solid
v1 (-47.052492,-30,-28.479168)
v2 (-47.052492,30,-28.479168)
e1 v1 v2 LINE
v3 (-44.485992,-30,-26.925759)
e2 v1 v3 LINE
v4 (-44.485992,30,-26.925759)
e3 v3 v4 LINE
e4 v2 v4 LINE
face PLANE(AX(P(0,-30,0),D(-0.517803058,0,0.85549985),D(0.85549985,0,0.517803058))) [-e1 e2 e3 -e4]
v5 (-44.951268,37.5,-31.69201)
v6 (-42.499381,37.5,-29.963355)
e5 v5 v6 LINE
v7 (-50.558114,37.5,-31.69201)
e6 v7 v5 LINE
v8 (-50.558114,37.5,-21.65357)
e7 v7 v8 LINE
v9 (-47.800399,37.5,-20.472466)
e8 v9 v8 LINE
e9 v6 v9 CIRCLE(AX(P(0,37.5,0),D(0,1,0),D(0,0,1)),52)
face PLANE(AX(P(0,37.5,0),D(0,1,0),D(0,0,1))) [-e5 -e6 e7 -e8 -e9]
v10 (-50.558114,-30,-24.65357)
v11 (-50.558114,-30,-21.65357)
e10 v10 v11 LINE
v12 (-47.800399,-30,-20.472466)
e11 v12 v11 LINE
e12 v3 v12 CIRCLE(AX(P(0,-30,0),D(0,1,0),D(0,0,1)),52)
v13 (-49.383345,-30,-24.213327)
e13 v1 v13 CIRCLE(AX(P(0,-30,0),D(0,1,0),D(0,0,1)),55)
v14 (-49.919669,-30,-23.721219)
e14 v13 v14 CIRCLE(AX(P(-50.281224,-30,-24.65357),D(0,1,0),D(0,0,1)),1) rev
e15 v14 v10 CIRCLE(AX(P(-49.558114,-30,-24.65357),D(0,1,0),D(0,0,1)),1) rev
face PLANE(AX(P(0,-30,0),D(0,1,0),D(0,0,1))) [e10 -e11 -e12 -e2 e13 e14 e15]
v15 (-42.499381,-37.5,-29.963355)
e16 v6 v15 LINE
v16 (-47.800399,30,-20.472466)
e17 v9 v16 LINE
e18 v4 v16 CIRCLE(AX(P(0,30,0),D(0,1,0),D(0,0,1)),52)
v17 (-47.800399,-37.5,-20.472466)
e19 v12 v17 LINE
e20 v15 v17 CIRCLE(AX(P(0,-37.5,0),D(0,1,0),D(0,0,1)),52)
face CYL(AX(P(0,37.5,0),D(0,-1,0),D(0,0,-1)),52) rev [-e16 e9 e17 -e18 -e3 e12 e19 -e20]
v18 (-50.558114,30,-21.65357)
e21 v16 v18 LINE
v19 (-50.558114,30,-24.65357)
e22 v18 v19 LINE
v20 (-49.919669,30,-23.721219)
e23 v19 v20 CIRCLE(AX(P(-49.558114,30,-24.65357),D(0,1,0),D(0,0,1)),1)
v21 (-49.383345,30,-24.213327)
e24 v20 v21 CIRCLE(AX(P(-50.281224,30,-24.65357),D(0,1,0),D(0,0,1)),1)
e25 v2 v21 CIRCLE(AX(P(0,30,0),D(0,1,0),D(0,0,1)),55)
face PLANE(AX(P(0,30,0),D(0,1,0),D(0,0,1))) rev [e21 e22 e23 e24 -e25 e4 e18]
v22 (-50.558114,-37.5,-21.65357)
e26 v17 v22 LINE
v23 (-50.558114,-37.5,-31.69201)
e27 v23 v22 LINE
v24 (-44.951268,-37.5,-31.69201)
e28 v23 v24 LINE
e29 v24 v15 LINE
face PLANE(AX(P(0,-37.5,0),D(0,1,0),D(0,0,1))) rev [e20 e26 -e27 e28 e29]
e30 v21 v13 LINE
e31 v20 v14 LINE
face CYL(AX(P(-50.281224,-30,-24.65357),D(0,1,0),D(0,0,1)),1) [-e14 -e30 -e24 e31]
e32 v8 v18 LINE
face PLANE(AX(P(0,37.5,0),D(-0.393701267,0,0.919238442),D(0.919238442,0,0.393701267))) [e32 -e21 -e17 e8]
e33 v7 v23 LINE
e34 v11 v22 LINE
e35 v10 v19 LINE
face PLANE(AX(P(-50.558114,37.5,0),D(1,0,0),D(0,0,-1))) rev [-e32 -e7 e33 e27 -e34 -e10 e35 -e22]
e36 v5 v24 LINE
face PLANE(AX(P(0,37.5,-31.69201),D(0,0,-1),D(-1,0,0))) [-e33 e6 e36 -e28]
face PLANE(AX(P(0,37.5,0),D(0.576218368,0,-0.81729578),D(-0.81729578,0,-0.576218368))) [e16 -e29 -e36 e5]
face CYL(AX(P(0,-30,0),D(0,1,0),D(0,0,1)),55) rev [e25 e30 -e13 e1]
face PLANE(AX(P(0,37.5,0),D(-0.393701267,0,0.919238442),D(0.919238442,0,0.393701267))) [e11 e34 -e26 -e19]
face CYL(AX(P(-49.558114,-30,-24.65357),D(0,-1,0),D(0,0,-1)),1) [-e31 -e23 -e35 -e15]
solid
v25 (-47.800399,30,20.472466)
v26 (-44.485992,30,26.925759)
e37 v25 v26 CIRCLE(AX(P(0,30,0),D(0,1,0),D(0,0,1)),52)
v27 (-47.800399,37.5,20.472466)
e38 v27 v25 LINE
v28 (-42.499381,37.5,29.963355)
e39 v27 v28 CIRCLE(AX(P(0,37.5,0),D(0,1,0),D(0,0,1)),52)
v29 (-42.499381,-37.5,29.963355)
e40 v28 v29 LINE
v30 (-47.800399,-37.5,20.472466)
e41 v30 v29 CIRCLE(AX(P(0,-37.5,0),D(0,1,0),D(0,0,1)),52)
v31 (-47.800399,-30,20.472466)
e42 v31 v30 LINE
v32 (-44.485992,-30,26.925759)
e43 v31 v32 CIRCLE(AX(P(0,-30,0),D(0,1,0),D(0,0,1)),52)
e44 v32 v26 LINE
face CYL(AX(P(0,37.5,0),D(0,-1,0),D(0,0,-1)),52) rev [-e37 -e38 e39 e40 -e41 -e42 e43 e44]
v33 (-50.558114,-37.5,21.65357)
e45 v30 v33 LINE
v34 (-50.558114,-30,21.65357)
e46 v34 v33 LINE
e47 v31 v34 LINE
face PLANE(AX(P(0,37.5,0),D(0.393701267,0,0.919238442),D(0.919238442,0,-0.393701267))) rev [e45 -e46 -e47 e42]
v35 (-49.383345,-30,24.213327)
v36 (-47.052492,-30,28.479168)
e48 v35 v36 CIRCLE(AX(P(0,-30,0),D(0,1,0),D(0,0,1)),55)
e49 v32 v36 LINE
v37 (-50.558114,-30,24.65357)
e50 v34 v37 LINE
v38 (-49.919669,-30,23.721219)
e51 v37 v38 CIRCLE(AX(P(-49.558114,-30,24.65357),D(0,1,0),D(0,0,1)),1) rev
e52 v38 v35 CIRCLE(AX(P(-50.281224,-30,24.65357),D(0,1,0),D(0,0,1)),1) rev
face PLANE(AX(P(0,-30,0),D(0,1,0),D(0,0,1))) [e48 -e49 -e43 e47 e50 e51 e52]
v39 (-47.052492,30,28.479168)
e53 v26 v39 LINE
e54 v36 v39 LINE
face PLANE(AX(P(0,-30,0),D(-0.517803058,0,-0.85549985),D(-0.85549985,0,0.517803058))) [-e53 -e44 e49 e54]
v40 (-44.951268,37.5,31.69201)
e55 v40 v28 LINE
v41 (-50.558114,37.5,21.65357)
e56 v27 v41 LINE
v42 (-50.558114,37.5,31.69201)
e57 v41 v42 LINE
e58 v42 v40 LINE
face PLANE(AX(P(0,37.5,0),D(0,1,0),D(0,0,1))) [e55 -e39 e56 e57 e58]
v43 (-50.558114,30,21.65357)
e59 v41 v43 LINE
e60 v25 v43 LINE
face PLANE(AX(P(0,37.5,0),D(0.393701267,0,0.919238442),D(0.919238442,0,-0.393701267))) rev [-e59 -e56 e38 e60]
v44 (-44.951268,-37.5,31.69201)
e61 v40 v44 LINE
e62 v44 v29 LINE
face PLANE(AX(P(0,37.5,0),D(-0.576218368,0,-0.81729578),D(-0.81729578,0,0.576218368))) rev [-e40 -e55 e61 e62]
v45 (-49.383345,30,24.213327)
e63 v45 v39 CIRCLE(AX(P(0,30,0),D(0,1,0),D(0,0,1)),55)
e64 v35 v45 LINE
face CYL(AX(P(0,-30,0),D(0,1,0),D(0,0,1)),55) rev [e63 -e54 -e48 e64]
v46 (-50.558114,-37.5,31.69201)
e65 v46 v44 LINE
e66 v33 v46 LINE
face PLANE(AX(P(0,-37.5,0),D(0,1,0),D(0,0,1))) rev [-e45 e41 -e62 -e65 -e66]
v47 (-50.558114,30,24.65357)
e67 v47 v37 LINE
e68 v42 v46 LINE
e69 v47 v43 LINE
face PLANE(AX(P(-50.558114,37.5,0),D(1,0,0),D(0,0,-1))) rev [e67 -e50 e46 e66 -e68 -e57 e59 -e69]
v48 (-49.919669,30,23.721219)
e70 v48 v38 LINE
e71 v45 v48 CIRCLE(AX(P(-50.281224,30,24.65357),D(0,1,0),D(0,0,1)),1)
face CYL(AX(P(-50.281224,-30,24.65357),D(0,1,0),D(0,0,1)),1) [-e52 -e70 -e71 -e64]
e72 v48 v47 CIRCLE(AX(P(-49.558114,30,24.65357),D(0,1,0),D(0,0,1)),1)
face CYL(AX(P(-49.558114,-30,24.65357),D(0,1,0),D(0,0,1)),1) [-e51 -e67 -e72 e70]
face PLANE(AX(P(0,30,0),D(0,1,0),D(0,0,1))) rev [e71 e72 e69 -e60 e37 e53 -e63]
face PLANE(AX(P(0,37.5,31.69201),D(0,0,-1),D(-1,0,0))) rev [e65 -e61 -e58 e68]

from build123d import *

# Parameters (mm, degrees)
BOSS_EXTRUDE1_DEPTH   = 37.5
BOSS_EXTRUDE1_2_DEPTH = 37.5
CUT_EXTRUDE1_START    = -30
CUT_EXTRUDE1_DEPTH    = 60
SKETCH2_W             = 47.307139372
SKETCH2_H             = 60
CUT_EXTRUDE2_DEPTH    = 10
FILLET1_R             = 1
FILLET2_R             = 1


# Read off the part's stored shape, not the designer's step: Cut-Extrude1
with BuildPart() as part:
    # Sketch1 → Boss-Extrude1 (new, symmetric)
    with BuildSketch(Plane(origin=(0, 0, 0), x_dir=(1, 0, 0), z_dir=(0, 1, 0))):
        with BuildLine():
            Line((-50.558114283, 21.653569686), (-47.800398958, 20.472465885))
            ThreePointArc((-47.800398958, 20.472465885), (-45.398587973, 25.356817822), (-42.499380558, 29.963355156))
            Line((-42.499380558, 29.963355156), (-44.951267898, 31.692010261))
            Line((-44.951267898, 31.692010261), (-50.558114283, 31.692010261))
            Line((-50.558114283, 31.692010261), (-50.558114283, 21.653569686))
        make_face()
    extrude(amount=BOSS_EXTRUDE1_DEPTH, both=True)


with BuildPart() as body_2:
    # Sketch1 → Boss-Extrude1 2 (new, symmetric)
    with BuildSketch(Plane(origin=(0, 0, 0), x_dir=(1, 0, 0), z_dir=(0, 1, 0))):
        with BuildLine():
            Line((-47.800398958, -20.472465885), (-50.558114283, -21.653569686))
            Line((-50.558114283, -21.653569686), (-50.558114283, -31.692010261))
            Line((-50.558114283, -31.692010261), (-44.951267898, -31.692010261))
            Line((-44.951267898, -31.692010261), (-42.499380558, -29.963355156))
            ThreePointArc((-42.499380558, -29.963355156), (-45.398587973, -25.356817822), (-47.800398958, -20.472465885))
        make_face()
    extrude(amount=BOSS_EXTRUDE1_2_DEPTH, both=True)


with BuildPart() as cut_extrude1_tool:
    # Cut-Extrude1 outline → Cut-Extrude1 (new body)
    with BuildSketch(Plane(origin=(0, 0, 0), x_dir=(1, 0, 0), z_dir=(0, 1, 0)).offset(CUT_EXTRUDE1_START)):
        with BuildLine():
            Line((-44.4859922, 26.925759005), (-47.05249175, 28.479168178))
            ThreePointArc((-47.05249175, 28.479168178), (-48.924480592, 25.12757845), (-50.558114283, 21.653569686))
            Line((-50.558114283, 21.653569686), (-47.800398958, 20.472465885))
            ThreePointArc((-47.800398958, 20.472465885), (-46.25587256, 23.756983262), (-44.4859922, 26.925759005))
        make_face()
        with BuildLine():
            Line((-47.800398958, -20.472465885), (-50.558114283, -21.653569686))
            ThreePointArc((-50.558114283, -21.653569686), (-48.924480592, -25.12757845), (-47.05249175, -28.479168178))
            Line((-47.05249175, -28.479168178), (-44.4859922, -26.925759005))
            ThreePointArc((-44.4859922, -26.925759005), (-46.25587256, -23.756983262), (-47.800398958, -20.472465885))
        make_face()
    extrude(amount=CUT_EXTRUDE1_DEPTH)


with BuildPart() as part_1:
    add(part.part)

    # Cut-Extrude1: cut by cut_extrude1_tool
    add(cut_extrude1_tool.part, mode=Mode.SUBTRACT)


with BuildPart() as body_2_1:
    add(body_2.part)

    # Cut-Extrude1: cut by cut_extrude1_tool
    add(cut_extrude1_tool.part, mode=Mode.SUBTRACT)


with BuildPart() as cut_extrude2_tool:
    # Sketch2 → Cut-Extrude2 (new body)
    with BuildSketch(Plane.ZY.offset(50.558114283)):
        Rectangle(SKETCH2_W, SKETCH2_H)
    extrude(amount=-CUT_EXTRUDE2_DEPTH)


with BuildPart() as part_2:
    add(part_1.part)

    # Cut-Extrude2: cut by cut_extrude2_tool
    add(cut_extrude2_tool.part, mode=Mode.SUBTRACT)

    # Fillet1
    # the kernel refuses this fillet: 1 mm, written as the material it takes off along each edge
    with BuildSketch(Plane(origin=(-49.653888479, 30, -23.653569686), x_dir=(-1, 0, 0), z_dir=(0, -1, 0))) as fillet1_piece_1:
        with BuildLine():
            CenterArc((0.627335668, 1), FILLET1_R, 206.119342863, 63.880657137)
            ThreePointArc((-0.270543335, 0.559757684), (-0.134480737, 0.280261116), (0, 0))
            Line((0, 0), (0.627335668, 0))
        make_face()
    extrude(amount=60, mode=Mode.SUBTRACT)
    with BuildSketch(Plane(origin=(-50.558114283, 30, -23.653569686), x_dir=(1, 0, 0), z_dir=(0, -1, 0))) as fillet1_piece_2:
        with BuildLine():
            CenterArc((FILLET1_R, -FILLET1_R), FILLET1_R, 90, 90)
            Line((0, -FILLET1_R), (0, 0))
            Line((0, 0), (FILLET1_R, 0))
        make_face()
    extrude(amount=60, mode=Mode.SUBTRACT)


with BuildPart() as body_2_2:
    add(body_2_1.part)

    # Cut-Extrude2: cut by cut_extrude2_tool
    add(cut_extrude2_tool.part, mode=Mode.SUBTRACT)

    # Fillet2
    # the kernel refuses this fillet: 1 mm, written as the material it takes off along each edge
    with BuildSketch(Plane(origin=(-50.558114283, -30, 23.653569686), x_dir=(0, 0, 1), z_dir=(0, 1, 0))) as fillet2_piece_1:
        with BuildLine():
            CenterArc((FILLET2_R, FILLET2_R), FILLET2_R, 180, 90)
            Line((0, FILLET2_R), (0, 0))
            Line((0, 0), (FILLET2_R, 0))
        make_face()
    extrude(amount=60, mode=Mode.SUBTRACT)
    with BuildSketch(Plane(origin=(-49.653888479, 30, 23.653569686), x_dir=(-1, 0, 0), z_dir=(0, -1, 0))) as fillet2_piece_2:
        with BuildLine():
            CenterArc((0.627335668, -1), FILLET2_R, 90, 63.880657137)
            ThreePointArc((-0.270543335, -0.559757684), (-0.134480737, -0.280261116), (0, 0))
            Line((0, 0), (0.627335668, 0))
        make_face()
    extrude(amount=60, mode=Mode.SUBTRACT)


solid = Compound([part_2.part, body_2_2.part])
